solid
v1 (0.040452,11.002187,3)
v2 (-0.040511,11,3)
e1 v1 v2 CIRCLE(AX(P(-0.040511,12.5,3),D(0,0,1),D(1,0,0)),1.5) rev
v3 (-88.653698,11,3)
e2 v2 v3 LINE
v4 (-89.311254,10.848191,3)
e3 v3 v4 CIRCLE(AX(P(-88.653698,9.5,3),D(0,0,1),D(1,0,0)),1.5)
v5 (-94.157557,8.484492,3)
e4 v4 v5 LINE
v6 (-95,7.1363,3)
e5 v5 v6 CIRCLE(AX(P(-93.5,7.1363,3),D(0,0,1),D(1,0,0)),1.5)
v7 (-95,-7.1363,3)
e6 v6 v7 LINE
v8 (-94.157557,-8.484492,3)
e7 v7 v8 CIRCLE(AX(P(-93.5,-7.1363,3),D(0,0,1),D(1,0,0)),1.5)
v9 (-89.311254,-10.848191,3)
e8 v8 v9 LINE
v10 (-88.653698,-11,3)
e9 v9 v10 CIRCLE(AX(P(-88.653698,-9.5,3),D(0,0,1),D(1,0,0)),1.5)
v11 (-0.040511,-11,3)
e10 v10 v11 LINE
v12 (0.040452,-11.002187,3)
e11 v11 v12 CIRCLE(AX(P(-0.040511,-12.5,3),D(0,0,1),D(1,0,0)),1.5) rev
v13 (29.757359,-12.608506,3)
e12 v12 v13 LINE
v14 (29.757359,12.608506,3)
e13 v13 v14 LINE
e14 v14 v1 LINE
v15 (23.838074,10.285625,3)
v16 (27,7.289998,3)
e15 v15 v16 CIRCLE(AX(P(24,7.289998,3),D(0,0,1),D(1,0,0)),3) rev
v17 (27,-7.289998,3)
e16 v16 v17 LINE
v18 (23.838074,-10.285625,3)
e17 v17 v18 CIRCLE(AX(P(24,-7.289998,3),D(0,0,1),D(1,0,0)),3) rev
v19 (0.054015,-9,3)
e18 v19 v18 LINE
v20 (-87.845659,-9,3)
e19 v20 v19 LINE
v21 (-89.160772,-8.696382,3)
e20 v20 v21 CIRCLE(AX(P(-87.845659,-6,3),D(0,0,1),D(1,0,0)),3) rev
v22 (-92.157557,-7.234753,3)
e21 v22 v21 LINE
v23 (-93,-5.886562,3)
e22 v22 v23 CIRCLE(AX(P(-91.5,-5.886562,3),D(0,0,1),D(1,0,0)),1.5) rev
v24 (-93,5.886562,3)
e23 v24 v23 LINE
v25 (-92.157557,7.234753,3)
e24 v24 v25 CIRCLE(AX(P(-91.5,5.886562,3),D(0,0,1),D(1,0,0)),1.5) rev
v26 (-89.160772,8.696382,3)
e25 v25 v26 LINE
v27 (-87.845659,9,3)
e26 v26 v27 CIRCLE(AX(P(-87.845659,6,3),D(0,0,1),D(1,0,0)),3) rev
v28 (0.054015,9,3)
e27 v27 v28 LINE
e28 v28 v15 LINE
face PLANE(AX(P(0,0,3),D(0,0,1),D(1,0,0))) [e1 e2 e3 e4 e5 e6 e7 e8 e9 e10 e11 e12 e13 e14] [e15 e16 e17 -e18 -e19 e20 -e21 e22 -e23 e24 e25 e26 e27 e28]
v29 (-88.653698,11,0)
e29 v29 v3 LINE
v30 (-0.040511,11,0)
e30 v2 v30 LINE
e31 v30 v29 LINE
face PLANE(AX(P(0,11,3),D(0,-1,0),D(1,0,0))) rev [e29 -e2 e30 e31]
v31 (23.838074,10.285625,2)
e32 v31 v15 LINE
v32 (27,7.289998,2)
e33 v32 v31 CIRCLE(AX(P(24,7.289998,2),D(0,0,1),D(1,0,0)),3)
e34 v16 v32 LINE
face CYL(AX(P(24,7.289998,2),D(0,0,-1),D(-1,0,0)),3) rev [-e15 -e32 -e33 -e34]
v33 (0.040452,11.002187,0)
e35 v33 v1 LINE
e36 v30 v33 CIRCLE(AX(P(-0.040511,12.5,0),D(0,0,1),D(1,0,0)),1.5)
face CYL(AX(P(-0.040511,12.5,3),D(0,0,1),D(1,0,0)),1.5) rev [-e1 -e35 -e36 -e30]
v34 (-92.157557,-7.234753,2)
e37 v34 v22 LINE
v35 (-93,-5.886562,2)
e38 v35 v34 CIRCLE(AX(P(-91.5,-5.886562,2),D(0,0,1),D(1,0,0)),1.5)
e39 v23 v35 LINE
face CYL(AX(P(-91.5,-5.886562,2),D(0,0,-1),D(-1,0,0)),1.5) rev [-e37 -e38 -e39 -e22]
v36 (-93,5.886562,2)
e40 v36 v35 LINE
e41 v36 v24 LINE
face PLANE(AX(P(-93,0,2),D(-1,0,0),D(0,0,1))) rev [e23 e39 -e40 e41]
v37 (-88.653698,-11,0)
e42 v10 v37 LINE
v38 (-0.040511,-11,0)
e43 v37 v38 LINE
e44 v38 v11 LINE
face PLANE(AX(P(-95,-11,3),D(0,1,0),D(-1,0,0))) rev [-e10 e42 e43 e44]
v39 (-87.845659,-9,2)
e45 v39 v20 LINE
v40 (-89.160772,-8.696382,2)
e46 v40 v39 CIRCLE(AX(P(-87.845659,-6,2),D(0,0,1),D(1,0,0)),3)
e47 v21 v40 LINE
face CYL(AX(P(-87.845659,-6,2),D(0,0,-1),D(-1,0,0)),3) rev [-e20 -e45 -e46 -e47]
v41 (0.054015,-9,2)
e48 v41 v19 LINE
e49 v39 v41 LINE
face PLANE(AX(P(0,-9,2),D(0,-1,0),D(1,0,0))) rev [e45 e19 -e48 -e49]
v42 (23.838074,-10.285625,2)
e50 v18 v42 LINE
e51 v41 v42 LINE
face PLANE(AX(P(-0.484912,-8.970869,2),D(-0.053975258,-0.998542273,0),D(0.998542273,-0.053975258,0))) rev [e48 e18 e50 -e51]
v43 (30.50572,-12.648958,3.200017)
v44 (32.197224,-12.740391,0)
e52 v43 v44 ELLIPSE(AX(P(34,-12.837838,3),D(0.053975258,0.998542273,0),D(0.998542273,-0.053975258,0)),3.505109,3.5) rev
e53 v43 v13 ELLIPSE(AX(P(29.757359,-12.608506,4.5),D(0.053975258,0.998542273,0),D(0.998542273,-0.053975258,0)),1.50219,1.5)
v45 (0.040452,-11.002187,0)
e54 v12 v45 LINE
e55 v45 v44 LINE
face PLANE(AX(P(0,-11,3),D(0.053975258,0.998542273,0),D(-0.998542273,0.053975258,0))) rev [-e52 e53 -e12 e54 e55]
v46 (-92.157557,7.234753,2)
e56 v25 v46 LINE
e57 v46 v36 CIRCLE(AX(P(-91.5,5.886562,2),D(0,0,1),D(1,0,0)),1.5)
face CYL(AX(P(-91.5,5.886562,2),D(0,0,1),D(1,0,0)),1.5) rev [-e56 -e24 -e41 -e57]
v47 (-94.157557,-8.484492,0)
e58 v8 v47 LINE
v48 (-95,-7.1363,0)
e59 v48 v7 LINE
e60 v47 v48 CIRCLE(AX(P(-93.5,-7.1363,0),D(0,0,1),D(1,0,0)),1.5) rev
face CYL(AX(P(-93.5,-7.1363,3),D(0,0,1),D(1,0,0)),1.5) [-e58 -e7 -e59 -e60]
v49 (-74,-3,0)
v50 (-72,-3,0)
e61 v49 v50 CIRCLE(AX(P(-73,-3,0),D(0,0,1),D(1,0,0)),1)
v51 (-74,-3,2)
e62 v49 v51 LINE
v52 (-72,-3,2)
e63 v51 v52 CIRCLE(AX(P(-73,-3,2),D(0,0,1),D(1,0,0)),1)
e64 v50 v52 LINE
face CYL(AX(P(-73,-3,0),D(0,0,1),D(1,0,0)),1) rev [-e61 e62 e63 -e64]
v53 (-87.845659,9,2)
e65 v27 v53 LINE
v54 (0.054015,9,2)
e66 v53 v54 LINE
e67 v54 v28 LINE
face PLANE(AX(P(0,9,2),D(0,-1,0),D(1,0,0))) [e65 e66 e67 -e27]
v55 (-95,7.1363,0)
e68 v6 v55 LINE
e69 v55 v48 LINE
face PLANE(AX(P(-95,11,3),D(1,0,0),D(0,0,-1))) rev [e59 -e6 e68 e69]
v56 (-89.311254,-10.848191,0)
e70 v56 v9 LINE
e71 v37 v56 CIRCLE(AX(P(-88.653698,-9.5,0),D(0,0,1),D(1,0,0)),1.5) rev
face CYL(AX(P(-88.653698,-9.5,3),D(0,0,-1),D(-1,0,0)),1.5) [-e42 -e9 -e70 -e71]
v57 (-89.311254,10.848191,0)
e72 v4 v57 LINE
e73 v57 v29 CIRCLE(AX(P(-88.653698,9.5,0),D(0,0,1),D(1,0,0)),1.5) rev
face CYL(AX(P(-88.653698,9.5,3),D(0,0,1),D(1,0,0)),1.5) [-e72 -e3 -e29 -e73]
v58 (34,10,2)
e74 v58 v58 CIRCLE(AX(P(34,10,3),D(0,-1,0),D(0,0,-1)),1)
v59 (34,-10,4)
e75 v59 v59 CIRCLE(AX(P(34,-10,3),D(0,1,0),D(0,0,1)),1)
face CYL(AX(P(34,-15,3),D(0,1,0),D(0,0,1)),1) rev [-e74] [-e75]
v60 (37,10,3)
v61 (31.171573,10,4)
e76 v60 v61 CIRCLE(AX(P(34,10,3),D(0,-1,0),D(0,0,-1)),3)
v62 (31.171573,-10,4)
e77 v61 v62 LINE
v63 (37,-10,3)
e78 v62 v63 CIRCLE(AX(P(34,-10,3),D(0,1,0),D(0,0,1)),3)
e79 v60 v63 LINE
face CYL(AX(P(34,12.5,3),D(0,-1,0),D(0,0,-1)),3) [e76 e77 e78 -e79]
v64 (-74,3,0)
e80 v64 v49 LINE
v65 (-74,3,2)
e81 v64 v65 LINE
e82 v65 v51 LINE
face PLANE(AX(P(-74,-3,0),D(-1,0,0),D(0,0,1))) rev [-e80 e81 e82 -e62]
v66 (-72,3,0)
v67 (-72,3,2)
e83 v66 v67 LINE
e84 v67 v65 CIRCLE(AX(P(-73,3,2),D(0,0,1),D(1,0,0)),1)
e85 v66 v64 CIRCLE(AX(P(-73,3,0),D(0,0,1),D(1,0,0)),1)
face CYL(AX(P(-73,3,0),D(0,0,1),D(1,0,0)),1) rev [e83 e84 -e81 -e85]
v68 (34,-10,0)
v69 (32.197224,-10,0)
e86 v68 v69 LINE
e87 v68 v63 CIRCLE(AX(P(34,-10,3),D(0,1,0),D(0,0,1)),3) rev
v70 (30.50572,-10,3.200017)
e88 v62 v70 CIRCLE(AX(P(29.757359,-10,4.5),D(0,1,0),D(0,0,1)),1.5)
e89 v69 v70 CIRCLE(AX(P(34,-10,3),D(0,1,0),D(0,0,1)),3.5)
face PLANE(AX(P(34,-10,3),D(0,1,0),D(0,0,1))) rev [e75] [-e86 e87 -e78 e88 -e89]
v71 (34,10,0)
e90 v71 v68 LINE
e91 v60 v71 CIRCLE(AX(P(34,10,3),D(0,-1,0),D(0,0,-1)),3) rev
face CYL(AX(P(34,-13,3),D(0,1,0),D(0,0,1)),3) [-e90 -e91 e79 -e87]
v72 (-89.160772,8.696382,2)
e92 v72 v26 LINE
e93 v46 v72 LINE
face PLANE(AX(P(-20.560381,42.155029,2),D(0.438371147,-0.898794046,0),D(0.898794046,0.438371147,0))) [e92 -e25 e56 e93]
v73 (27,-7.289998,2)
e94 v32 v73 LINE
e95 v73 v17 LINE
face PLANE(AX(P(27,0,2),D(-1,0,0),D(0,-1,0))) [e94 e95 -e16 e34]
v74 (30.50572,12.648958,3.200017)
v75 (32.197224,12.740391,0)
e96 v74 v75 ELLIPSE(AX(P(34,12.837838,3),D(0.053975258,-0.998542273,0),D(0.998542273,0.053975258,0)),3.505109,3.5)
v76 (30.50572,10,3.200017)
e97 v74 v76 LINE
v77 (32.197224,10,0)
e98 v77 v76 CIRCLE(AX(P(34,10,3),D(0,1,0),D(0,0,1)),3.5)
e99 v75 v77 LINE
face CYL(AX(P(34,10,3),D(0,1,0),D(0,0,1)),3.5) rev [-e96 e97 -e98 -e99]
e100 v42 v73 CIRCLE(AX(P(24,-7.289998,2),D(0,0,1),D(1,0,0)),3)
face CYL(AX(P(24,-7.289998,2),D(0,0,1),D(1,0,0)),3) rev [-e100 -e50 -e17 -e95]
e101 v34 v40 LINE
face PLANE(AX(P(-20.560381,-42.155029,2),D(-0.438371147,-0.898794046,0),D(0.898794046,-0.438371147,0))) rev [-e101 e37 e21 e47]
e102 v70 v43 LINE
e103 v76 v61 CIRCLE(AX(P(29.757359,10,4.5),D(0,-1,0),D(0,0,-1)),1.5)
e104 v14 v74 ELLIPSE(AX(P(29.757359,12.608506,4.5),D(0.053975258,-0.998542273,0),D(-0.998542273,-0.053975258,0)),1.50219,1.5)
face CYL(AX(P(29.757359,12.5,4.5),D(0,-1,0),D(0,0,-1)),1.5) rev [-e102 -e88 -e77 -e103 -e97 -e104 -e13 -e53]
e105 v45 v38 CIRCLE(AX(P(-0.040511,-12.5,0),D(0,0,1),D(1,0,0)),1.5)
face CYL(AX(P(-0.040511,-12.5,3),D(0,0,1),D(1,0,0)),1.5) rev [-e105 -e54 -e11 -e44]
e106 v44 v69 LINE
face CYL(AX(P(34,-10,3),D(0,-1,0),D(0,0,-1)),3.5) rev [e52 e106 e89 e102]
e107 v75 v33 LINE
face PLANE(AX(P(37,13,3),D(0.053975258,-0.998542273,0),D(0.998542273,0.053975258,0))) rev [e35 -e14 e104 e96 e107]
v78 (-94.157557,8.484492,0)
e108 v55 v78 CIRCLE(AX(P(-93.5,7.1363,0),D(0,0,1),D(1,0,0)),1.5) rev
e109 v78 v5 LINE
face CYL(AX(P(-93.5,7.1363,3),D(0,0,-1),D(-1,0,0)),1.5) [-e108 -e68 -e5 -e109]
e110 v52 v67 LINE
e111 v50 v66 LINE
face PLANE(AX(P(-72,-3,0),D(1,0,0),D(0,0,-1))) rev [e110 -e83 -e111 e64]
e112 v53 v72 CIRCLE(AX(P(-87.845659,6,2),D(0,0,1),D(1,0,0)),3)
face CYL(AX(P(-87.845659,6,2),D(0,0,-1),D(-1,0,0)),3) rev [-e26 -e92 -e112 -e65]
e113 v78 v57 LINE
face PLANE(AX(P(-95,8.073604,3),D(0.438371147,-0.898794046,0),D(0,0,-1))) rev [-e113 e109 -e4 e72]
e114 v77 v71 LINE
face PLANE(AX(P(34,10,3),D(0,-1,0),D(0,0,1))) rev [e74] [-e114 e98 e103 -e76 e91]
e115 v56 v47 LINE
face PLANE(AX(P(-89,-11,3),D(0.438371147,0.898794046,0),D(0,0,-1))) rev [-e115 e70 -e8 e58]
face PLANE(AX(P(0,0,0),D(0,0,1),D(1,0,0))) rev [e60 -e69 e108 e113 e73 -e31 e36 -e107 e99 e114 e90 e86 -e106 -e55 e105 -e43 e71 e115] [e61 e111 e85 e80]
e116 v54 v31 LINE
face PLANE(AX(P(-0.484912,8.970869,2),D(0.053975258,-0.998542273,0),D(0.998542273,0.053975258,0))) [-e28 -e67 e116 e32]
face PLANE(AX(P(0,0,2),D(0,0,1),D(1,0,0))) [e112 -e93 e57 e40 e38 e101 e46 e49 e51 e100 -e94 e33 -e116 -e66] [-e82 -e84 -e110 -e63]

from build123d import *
from OCP.BRepFilletAPI import BRepFilletAPI_MakeChamfer, BRepFilletAPI_MakeFillet

# Parameters (mm, degrees)
SALIENTE_EXTRUIR1_DEPTH = 3
CHAFL_N1_SIZE           = 6
CHAFL_N1_SIZE2          = 2.926395531
CORTAR_EXTRUIR1_DEPTH   = 1
CROQUIS8_R              = 3
SALIENTE_EXTRUIR2_DEPTH = 12.5
REDONDEO1_R             = 3
CROQUIS9_R              = 3.5
CORTAR_EXTRUIR3_DEPTH   = 3
REDONDEO2_R             = 1.5
CROQUIS10_R             = 1
CORTAR_EXTRUIR4_DEPTH   = 15
CORTAR_EXTRUIR5_DEPTH   = 96.933922834
REDONDEO3_R1            = 3
REDONDEO3_R2            = 1.5
REDONDEO4_R             = 1.5


with BuildPart() as part:
    # Croquis1 → Saliente-Extruir1 (new body)
    with BuildSketch(Plane.XY):
        Polygon((0, 11), (-95, 11), (-95, -11), (0, -11), (37, -13), (37, 13), align=None)
    extrude(amount=SALIENTE_EXTRUIR1_DEPTH)

    # Chaflán1: one chamfer whose edges measure the first distance from different faces: ONE call of the kernel's chamfer builder (chamfer() names one face for all edges)
    chafl_n1_edges_1 = [part.edges().sort_by_distance(p)[0] for p in [
        (-95, 11, 1.5),
    ]]
    chafl_n1_side_1 = [part.faces().sort_by_distance(p)[0] for p in [
        (-47.5, 11, 1.5),
    ]]
    chafl_n1_edges_2 = [part.edges().sort_by_distance(p)[0] for p in [
        (-95, -11, 1.5),
    ]]
    chafl_n1_side_2 = [part.faces().sort_by_distance(p)[0] for p in [
        (-47.5, -11, 1.5),
    ]]
    chafl_n1 = BRepFilletAPI_MakeChamfer(part.part.solid().wrapped)
    for e in chafl_n1_edges_1:
        chafl_n1.Add(CHAFL_N1_SIZE, CHAFL_N1_SIZE2, e.wrapped, chafl_n1_side_1[0].wrapped)  # the first distance lies on this face
    for e in chafl_n1_edges_2:
        chafl_n1.Add(CHAFL_N1_SIZE, CHAFL_N1_SIZE2, e.wrapped, chafl_n1_side_2[0].wrapped)  # the first distance lies on this face
    add(Compound.cast(chafl_n1.Shape()), mode=Mode.REPLACE)

    # Croquis7 → Cortar-Extruir1 (cut)
    with BuildSketch(Plane.XY.offset(3)):
        Polygon((-88.538263618, 9), (-93, 6.823865765), (-93, 0), (27, 0), (27, 10.45653975), (0.054014627, 9), align=None)
        Polygon((27, 0), (-93, 0), (-93, -6.823865765), (-88.538263618, -9), (0.054014627, -9), (27, -10.45653975), align=None)
    extrude(amount=-CORTAR_EXTRUIR1_DEPTH, mode=Mode.SUBTRACT)

    # Croquis8 → Saliente-Extruir2 (add, symmetric)
    with BuildSketch(Plane(origin=(0, 0, 0), x_dir=(1, 0, 0), z_dir=(0, 1, 0))):
        with Locations((34, -3)):
            Circle(CROQUIS8_R)
    extrude(amount=SALIENTE_EXTRUIR2_DEPTH, both=True)

    # Redondeo1
    redondeo1_edges = [part.edges().sort_by_distance(p)[0] for p in [
        (37, 0, 0),
    ]]
    fillet(redondeo1_edges, radius=REDONDEO1_R - 0.0001)  # a hair under: the kernel refuses the full size

    # Croquis9 → Cortar-Extruir3 (cut)
    with BuildSketch(Plane(origin=(0, -13, 0), x_dir=(1, 0, 0), z_dir=(0, 1, 0))):
        with Locations((34, -3)):
            Circle(CROQUIS9_R)
    cortar_extruir3 = extrude(amount=CORTAR_EXTRUIR3_DEPTH, mode=Mode.SUBTRACT)

    # Simetría1: Cortar-Extruir3 across plane
    add(cortar_extruir3.mirror(Plane.ZX), mode=Mode.SUBTRACT)

    # Redondeo2
    redondeo2_edges = [part.edges().sort_by_distance(p)[0] for p in [
        (31, 0, 3),
    ]]
    fillet(redondeo2_edges, radius=REDONDEO2_R)

    # Croquis10 → Cortar-Extruir4 (cut, symmetric)
    with BuildSketch(Plane(origin=(0, 0, 0), x_dir=(1, 0, 0), z_dir=(0, 1, 0))):
        with Locations(Location((34, -3, 0), (0, 0, 270))):
            Circle(CROQUIS10_R)
    extrude(amount=CORTAR_EXTRUIR4_DEPTH, both=True, mode=Mode.SUBTRACT)

    # Croquis11 → Cortar-Extruir5 (cut, through all)
    with BuildSketch(Plane.XY.offset(2)):
        with BuildLine():
            Line((-74, -3), (-74, 3))
            ThreePointArc((-74, 3), (-73, 4), (-72, 3))
            Line((-72, 3), (-72, -3))
            ThreePointArc((-72, -3), (-73, -4), (-74, -3))
        make_face()
    extrude(amount=-CORTAR_EXTRUIR5_DEPTH, mode=Mode.SUBTRACT)

    # Redondeo3: one fillet with a radius per group of edges: ONE call of the kernel's fillet builder (fillet() takes one radius for all edges)
    redondeo3_edges_1 = [part.edges().sort_by_distance(p)[0] for p in [
        (27, 10.45653975, 2.5),
        (27, -10.45653975, 2.5),
        (-88.538263618, 9, 2.5),
        (-88.538263618, -9, 2.5),
    ]]
    redondeo3_edges_2 = [part.edges().sort_by_distance(p)[0] for p in [
        (-93, 6.823865765, 2.5),
        (-93, -6.823865765, 2.5),
    ]]
    redondeo3 = BRepFilletAPI_MakeFillet(part.part.solid().wrapped)
    for e in redondeo3_edges_1:
        redondeo3.Add(REDONDEO3_R1, e.wrapped)
    for e in redondeo3_edges_2:
        redondeo3.Add(REDONDEO3_R2, e.wrapped)
    add(Compound.cast(redondeo3.Shape()), mode=Mode.REPLACE)

    # Redondeo4
    redondeo4_edges = [part.edges().sort_by_distance(p)[0] for p in [
        (0, 11, 1.5),
        (0, -11, 1.5),
        (-89, -11, 1.5),
        (-95, 8.073604469, 1.5),
        (-95, -8.073604469, 1.5),
        (-89, 11, 1.5),
    ]]
    fillet(redondeo4_edges, radius=REDONDEO4_R)


solid = part.part
